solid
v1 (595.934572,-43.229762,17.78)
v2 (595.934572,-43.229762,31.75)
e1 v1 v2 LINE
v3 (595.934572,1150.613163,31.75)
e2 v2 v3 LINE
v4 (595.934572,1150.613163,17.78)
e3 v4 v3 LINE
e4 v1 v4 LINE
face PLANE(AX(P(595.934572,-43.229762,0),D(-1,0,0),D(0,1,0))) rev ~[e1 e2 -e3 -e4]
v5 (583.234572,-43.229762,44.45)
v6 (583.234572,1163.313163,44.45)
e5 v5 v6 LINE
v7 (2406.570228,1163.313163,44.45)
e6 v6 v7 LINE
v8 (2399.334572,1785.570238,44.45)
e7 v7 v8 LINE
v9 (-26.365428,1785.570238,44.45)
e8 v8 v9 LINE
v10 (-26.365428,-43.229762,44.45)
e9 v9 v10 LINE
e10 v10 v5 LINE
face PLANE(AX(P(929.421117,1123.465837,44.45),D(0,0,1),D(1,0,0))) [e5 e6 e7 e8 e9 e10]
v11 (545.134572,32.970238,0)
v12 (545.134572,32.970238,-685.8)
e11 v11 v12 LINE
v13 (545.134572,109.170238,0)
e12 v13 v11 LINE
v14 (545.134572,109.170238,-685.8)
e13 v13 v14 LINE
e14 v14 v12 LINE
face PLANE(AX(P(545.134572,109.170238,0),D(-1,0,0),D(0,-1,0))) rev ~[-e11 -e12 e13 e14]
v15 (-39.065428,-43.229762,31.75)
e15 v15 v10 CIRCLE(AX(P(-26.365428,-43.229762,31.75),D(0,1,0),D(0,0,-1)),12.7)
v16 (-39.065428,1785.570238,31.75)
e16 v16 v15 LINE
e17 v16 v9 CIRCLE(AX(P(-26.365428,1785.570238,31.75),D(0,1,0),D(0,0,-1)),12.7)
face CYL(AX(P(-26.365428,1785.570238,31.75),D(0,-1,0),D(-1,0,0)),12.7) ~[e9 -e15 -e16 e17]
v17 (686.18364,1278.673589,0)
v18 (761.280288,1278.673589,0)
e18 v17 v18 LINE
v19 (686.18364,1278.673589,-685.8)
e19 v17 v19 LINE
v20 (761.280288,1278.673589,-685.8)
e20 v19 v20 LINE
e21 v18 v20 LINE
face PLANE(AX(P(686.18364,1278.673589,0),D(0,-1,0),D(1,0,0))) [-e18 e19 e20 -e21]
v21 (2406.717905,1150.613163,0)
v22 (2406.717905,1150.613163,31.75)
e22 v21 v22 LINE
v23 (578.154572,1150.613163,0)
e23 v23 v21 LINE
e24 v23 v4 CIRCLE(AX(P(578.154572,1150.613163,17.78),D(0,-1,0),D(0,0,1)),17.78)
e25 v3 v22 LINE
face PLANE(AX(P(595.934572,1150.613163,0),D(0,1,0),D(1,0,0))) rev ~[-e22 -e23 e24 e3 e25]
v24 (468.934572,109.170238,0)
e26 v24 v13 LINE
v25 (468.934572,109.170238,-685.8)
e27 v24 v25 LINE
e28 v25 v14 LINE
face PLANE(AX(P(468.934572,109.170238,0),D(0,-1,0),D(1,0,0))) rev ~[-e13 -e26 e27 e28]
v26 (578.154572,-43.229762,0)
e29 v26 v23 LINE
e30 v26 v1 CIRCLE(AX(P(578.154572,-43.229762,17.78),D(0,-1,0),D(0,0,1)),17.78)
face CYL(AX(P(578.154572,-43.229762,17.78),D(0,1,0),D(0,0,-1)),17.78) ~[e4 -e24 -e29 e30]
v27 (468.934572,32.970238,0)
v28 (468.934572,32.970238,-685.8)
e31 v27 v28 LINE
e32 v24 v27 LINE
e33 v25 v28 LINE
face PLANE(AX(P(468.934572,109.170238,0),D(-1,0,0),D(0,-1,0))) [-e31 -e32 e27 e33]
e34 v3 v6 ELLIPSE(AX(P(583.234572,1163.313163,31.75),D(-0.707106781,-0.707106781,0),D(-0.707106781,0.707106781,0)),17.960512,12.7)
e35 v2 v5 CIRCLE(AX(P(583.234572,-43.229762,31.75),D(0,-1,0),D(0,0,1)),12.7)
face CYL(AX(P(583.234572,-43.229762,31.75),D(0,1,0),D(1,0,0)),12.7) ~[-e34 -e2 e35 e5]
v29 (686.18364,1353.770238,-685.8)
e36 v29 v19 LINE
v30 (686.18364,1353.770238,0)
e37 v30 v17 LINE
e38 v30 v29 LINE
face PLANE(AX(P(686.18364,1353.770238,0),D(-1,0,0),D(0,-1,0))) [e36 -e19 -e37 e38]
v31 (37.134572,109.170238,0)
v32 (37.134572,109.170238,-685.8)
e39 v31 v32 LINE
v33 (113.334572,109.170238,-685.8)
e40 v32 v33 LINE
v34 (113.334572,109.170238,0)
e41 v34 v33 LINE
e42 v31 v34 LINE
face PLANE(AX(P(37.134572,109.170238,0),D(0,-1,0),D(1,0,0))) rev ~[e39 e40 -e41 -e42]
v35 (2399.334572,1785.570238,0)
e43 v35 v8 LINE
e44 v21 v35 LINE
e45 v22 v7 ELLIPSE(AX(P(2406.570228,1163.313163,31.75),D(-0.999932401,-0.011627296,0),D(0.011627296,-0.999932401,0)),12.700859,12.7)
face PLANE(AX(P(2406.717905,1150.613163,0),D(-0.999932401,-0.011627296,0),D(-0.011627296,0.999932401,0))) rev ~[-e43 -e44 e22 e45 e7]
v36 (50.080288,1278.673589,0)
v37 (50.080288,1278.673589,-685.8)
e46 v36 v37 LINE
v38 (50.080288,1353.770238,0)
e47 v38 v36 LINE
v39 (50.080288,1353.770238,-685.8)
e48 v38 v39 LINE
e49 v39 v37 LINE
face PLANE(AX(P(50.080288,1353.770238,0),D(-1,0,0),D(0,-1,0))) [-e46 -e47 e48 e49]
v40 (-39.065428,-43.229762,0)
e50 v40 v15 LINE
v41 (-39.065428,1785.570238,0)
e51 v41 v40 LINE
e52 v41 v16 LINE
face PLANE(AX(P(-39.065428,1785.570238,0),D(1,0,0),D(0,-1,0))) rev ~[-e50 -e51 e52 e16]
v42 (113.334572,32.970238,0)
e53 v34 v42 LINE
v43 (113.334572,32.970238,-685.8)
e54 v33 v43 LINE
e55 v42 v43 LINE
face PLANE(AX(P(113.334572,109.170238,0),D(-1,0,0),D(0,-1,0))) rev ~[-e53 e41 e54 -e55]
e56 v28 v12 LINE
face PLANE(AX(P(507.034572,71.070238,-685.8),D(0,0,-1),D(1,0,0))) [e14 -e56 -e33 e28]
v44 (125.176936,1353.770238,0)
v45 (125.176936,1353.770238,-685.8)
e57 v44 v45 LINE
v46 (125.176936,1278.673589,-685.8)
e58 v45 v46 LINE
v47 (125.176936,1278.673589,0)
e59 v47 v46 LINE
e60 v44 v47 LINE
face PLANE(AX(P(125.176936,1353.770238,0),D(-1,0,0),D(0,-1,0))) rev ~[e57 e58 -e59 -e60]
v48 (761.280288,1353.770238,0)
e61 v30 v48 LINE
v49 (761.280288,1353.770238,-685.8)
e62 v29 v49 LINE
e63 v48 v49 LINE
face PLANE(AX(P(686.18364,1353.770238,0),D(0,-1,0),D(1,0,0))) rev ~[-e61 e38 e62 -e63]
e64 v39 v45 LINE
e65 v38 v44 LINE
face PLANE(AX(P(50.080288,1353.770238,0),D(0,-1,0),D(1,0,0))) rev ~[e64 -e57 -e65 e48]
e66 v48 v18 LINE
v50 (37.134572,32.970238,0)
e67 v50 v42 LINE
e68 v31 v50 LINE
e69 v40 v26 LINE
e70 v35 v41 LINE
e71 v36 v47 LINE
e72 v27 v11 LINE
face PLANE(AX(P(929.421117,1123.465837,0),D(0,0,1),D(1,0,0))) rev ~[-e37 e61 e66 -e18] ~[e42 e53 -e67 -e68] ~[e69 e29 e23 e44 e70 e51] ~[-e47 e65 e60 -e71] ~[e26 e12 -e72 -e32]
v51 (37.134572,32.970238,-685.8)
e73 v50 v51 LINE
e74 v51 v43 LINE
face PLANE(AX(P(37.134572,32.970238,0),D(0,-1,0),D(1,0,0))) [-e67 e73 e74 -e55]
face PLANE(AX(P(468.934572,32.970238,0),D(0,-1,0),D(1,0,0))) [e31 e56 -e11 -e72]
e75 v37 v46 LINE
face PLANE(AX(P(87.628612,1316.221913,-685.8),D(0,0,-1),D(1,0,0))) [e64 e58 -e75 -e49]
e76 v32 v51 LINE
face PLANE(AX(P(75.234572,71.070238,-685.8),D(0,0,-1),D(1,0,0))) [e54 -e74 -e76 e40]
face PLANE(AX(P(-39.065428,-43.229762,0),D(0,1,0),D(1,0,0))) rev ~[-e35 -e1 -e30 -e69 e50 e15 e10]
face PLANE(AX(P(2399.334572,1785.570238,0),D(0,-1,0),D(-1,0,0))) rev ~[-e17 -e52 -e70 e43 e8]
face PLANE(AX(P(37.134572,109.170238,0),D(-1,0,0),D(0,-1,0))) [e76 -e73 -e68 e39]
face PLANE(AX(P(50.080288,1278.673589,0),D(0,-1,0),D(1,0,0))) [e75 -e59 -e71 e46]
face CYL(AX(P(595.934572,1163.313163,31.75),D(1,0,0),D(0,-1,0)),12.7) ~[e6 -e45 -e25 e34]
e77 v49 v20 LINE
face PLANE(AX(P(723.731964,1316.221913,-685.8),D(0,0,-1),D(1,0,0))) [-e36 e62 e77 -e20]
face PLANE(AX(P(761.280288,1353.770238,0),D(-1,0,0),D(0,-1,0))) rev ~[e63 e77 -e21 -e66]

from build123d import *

# Parameters (mm, degrees)
F1_DEPTH = 44.45
F2_R     = 12.7
F3_R     = 17.78
F4_W     = 76.2
F4_H     = 76.2
F4_W_2   = 75.0966481864
F4_H_2   = 75.0966481864
F5_DEPTH = 685.8


# Not quite as in the source:
# - a feature names something its author has since deleted; it is built from what else it names


with BuildPart() as f1:
    # F0 (on Top) → F1 (new body)
    with BuildSketch(Plane.XY):
        Polygon((2406.7179050011, 1150.6131630864), (2399.3345719218, 1785.5702375352), (-39.0654280782, 1785.5702375352), (-39.0654280782, -43.2297624648), (595.9345719218, -43.2297624648), (595.9345719218, 1150.6131630864), align=None)
    extrude(amount=F1_DEPTH)

    # F2
    f2_edges = [f1.edges().sort_by_distance(p)[0] for p in [
        (595.934572, 553.6917, 44.45),
        (1501.326238, 1150.613163, 44.45),
        (-39.065428, 871.170238, 44.45),
    ]]
    fillet(f2_edges, radius=F2_R)

    # F3
    f3_edges = [f1.edges().sort_by_distance(p)[0] for p in [
        (595.934572, 553.6917, 0),
    ]]
    fillet(f3_edges, radius=F3_R)

    # F4 (on face) → F5 (join)
    with BuildSketch(Plane(origin=(0, 0, 0), x_dir=(1, 0, 0), z_dir=(0, 0, -1))):
        with Locations((75.2345719218, -71.0702375352)):
            Rectangle(F4_W, F4_H)
        with Locations((507.0345719218, -71.0702375352)):
            Rectangle(F4_W, F4_H)
        with Locations((723.7319641083, -1316.221913442)):
            Rectangle(F4_W_2, F4_H_2)
        with Locations((87.6286122948, -1316.221913442)):
            Rectangle(F4_W_2, F4_H_2)
    extrude(amount=F5_DEPTH)


solid = f1.part
